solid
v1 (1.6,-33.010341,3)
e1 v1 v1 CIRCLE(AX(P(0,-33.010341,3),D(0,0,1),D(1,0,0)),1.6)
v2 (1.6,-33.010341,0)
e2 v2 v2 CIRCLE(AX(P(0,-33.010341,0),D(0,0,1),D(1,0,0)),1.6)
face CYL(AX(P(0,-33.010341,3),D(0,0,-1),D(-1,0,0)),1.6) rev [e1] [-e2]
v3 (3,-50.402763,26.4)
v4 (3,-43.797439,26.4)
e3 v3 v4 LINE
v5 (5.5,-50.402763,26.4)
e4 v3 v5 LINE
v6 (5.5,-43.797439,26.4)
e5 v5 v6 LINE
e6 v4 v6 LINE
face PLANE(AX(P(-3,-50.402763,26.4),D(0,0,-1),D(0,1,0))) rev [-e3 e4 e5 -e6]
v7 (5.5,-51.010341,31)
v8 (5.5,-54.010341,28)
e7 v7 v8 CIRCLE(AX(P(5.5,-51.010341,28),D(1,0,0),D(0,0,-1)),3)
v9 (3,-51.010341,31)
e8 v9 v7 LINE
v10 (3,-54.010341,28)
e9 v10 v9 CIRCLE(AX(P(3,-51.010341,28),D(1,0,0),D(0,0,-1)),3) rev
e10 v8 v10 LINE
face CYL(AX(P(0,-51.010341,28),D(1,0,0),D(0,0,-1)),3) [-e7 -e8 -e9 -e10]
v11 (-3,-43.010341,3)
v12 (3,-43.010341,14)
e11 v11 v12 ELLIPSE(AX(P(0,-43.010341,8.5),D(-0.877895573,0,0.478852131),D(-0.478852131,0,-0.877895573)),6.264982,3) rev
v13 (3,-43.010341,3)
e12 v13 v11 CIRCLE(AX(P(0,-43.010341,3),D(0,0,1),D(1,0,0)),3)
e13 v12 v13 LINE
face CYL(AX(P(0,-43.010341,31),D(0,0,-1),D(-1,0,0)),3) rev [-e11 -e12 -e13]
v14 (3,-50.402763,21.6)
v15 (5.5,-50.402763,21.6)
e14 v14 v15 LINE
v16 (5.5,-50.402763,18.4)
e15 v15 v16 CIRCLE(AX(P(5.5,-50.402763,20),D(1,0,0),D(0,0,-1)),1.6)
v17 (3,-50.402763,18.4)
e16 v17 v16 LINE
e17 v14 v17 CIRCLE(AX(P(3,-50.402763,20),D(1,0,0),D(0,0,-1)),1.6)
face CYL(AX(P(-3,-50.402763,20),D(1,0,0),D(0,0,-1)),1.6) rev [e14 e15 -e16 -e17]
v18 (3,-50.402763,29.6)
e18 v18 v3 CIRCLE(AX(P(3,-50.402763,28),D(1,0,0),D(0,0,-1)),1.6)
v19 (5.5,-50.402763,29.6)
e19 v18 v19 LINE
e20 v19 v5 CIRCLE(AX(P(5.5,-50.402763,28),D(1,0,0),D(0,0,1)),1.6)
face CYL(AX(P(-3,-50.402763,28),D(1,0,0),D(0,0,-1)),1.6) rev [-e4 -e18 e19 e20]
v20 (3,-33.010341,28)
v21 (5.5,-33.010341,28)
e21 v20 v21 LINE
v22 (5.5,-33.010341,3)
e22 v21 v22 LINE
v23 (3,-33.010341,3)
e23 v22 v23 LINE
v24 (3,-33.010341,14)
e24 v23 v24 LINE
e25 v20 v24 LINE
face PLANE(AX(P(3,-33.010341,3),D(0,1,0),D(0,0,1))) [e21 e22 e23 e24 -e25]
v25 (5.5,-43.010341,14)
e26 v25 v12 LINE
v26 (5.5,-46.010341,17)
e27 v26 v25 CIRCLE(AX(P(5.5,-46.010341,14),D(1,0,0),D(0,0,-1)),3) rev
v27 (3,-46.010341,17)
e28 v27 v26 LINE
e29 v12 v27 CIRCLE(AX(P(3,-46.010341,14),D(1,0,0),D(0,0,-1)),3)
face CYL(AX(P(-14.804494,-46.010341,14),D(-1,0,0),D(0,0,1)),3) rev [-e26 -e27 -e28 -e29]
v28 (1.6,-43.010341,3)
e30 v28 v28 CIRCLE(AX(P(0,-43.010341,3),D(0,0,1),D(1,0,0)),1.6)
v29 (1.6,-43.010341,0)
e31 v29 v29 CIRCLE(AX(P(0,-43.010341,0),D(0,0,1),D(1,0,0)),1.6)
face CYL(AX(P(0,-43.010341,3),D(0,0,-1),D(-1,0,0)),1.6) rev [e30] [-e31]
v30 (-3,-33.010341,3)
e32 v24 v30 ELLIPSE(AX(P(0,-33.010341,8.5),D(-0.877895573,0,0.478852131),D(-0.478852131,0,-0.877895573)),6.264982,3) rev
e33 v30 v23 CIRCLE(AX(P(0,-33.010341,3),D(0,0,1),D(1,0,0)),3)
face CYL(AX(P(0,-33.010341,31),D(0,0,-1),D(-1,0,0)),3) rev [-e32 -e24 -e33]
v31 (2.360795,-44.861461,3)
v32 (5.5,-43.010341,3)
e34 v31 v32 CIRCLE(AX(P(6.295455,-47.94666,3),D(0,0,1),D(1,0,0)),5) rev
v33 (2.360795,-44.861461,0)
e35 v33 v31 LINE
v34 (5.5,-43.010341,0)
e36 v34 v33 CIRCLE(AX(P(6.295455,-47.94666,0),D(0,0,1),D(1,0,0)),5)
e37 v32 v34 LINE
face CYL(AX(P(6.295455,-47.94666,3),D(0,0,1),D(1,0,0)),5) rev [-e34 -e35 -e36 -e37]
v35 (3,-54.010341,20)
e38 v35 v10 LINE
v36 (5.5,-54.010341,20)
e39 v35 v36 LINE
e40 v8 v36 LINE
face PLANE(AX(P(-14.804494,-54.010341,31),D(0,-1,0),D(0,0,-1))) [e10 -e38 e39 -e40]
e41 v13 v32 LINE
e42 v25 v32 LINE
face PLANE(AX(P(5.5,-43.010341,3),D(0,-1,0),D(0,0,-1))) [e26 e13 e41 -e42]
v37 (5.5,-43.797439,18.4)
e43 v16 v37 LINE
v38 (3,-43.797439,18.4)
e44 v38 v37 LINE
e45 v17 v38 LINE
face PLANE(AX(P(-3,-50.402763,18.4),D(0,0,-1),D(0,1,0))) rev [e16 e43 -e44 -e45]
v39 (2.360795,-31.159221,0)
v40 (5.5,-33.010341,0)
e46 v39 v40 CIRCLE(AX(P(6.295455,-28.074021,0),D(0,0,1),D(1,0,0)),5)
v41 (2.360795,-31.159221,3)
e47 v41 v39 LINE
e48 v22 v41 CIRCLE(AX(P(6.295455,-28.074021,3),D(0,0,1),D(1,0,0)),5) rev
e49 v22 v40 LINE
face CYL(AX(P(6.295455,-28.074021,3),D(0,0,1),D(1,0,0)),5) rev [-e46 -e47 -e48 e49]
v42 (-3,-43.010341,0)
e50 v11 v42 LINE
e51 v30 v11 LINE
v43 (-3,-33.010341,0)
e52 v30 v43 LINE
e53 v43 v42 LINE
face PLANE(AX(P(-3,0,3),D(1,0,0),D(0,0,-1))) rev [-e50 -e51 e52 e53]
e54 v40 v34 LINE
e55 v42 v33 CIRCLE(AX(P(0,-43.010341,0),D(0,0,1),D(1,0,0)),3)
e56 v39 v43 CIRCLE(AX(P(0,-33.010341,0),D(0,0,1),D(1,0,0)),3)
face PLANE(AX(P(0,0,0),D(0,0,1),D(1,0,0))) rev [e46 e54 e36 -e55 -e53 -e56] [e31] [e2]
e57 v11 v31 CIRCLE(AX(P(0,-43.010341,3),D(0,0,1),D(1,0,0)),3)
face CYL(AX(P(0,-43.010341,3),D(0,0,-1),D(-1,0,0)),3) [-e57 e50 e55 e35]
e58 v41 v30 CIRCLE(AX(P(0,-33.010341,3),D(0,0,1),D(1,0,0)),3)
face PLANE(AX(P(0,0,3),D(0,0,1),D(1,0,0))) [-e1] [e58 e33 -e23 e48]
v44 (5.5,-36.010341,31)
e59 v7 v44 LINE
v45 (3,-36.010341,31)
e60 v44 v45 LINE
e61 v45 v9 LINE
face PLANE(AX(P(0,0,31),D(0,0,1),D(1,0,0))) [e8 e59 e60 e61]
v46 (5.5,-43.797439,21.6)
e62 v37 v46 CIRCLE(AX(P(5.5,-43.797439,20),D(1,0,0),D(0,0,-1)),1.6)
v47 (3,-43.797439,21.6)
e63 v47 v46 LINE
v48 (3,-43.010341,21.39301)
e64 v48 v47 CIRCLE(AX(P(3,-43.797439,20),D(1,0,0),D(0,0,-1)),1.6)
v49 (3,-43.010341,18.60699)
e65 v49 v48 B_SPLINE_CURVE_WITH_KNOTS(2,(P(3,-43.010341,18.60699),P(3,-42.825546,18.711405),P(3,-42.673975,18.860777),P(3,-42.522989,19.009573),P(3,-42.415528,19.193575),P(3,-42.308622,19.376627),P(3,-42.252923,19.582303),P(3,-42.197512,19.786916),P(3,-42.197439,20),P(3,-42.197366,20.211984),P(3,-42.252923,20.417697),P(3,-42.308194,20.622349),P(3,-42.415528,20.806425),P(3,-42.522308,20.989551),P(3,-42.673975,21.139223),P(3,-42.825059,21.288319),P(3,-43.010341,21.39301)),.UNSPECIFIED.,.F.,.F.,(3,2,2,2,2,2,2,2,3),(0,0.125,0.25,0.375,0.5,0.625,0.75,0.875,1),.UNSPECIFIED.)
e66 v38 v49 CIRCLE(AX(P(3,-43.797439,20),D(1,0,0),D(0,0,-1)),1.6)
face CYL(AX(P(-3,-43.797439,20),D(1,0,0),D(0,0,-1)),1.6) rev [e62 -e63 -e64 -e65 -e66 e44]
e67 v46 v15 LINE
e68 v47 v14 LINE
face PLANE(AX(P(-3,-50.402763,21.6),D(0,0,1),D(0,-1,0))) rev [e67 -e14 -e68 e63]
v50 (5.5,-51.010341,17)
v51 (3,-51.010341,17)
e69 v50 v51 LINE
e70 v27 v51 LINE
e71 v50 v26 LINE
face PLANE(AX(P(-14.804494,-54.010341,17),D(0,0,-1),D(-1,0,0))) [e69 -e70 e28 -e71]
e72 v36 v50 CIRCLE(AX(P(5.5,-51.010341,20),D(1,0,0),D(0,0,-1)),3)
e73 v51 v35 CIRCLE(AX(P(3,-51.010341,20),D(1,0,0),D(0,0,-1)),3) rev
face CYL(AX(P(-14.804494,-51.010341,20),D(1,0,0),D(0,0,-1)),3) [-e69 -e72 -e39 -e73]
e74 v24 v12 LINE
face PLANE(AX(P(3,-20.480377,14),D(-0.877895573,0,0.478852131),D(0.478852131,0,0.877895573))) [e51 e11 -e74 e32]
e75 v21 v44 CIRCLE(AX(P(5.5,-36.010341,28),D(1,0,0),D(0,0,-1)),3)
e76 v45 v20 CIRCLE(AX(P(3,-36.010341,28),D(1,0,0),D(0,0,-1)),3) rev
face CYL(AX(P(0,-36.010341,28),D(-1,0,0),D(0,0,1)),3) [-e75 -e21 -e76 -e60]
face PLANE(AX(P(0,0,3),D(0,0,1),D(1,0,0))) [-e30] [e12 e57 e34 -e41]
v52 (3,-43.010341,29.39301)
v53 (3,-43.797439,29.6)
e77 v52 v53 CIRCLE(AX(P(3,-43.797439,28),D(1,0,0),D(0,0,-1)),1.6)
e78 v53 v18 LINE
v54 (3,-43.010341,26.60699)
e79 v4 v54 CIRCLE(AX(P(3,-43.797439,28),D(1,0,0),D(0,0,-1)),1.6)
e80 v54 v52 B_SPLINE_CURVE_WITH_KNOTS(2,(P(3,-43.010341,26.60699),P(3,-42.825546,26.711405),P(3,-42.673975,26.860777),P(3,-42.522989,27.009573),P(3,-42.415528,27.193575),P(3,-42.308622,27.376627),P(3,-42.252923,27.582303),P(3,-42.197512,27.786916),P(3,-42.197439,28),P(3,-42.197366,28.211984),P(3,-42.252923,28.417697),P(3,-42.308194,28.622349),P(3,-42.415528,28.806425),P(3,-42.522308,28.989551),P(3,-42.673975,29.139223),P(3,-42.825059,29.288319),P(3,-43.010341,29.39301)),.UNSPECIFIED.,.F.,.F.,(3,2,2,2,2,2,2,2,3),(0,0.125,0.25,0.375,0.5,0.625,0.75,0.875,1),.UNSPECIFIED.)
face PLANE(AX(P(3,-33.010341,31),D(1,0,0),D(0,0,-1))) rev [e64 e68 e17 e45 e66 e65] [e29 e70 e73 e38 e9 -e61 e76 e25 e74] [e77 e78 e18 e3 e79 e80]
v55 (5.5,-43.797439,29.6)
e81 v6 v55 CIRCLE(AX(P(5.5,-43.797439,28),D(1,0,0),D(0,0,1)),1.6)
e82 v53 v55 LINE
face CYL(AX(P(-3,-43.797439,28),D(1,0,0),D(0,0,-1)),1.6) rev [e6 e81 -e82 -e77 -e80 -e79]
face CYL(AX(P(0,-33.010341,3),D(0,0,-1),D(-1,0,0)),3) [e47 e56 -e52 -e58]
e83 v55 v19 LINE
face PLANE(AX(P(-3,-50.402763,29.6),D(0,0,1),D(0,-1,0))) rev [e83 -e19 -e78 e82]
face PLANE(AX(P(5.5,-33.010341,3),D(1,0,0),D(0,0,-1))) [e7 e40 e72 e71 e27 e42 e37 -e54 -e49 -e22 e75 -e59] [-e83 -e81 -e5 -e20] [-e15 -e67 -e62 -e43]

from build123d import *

# Parameters (mm, degrees)
SKETCH_1_R          = 1.6
EXTRUDE_1_DEPTH     = 3
SKETCH_3_W          = 2.5
SKETCH_3_H          = 10
EXTRUDE_2_DEPTH     = 28
FILLET_1_R          = 5
FILLET_2_R          = 5
SKETCH_4_W          = 14
SKETCH_4_H          = 11
EXTRUDE_3_DEPTH     = 2.5
CUT_EXTRUDE_1_DEPTH = 63.851944341
EXTRUDE_4_DEPTH     = 10
SKETCH_8_R          = 3
CUT_EXTRUDE_2_DEPTH = 62.084915548
FILLET_3_R          = 3


with BuildPart() as part:
    # 草图1 → 凸台-拉伸1 (new body)
    with BuildSketch(Plane.XY):
        with BuildLine():
            ThreePointArc((3, -33.010340746), (0, -30.010340746), (-3, -33.010340746))
            Line((-3, -33.010340746), (-3, -43.010340746))
            ThreePointArc((-3, -43.010340746), (0, -46.010340746), (3, -43.010340746))
            Line((3, -43.010340746), (5.5, -43.010340746))
            Line((5.5, -43.010340746), (5.5, -33.010340746))
            Line((5.5, -33.010340746), (3, -33.010340746))
        make_face()
        with Locations((0, -33.010340746)):
            Circle(SKETCH_1_R, mode=Mode.SUBTRACT)
        with Locations((0, -43.010340746)):
            Circle(SKETCH_1_R, mode=Mode.SUBTRACT)
    extrude(amount=EXTRUDE_1_DEPTH)

    # 草图3 → 凸台-拉伸2 (add)
    with BuildSketch(Plane.XY.offset(3)):
        with Locations((4.25, -38.010340746)):
            Rectangle(SKETCH_3_W, SKETCH_3_H)
    extrude(amount=EXTRUDE_2_DEPTH)

    # 圆角1
    # the kernel refuses this fillet: 5 mm, written as the material it adds along each edge
    with BuildSketch(Plane(origin=(3, -43.010340746, 0), x_dir=(-0.32639560491693326, -0.9452332564456825, 0), z_dir=(0, 0, 1))) as fillet_1_piece_1:
        with BuildLine():
            CenterArc((3.590351654, 4.726166282), FILLET_1_R, 208.20428203, 42.745569225)
            Line((-0.815989012, 2.363083141), (0, 0))
            ThreePointArc((0, 0), (0.979186815, 0.164300231), (1.95837363, 0))
        make_face()
    extrude(amount=3)

    # 圆角2
    # the kernel refuses this fillet: 5 mm, written as the material it adds along each edge
    with BuildSketch(Plane(origin=(3, -33.010340746, 0), x_dir=(1, 0, 0), z_dir=(0, 0, 1))) as fillet_2_piece_1:
        with BuildLine():
            CenterArc((3.295454545, 4.936319688), FILLET_2_R, 218.100297491, 42.745569225)
            ThreePointArc((-0.639204545, 1.851119883), (-0.164300231, 0.979186815), (0, 0))
            Line((0, 0), (2.5, 0))
        make_face()
    extrude(amount=3)

    # 草图4 → 凸台-拉伸3 (add)
    with BuildSketch(Plane(origin=(5.5, 0, 0), x_dir=(0, 0, -1), z_dir=(1, 0, 0))):
        with Locations((-24, -48.510340746)):
            Rectangle(SKETCH_4_W, SKETCH_4_H)
    extrude(amount=-EXTRUDE_3_DEPTH)

    # 草图5 → 切除-拉伸1 (cut, through all)
    with BuildSketch(Plane(origin=(5.5, 0, 0), x_dir=(0, 0, -1), z_dir=(1, 0, 0))):
        with BuildLine():
            Line((-26.4, -50.402762968), (-26.4, -43.797439087))
            ThreePointArc((-26.4, -43.797439087), (-28, -42.197439087), (-29.6, -43.797439087))
            Line((-29.6, -43.797439087), (-29.6, -50.402762968))
            ThreePointArc((-29.6, -50.402762968), (-28, -52.002762968), (-26.4, -50.402762968))
        make_face()
        with BuildLine():
            Line((-21.6, -50.402762968), (-21.6, -43.797439087))
            ThreePointArc((-21.6, -43.797439087), (-20, -42.197439087), (-18.4, -43.797439087))
            Line((-18.4, -43.797439087), (-18.4, -50.402762968))
            ThreePointArc((-18.4, -50.402762968), (-20, -52.002762968), (-21.6, -50.402762968))
        make_face()
    extrude(amount=-CUT_EXTRUDE_1_DEPTH, mode=Mode.SUBTRACT)

    # 草图6 → 凸台-拉伸4 (add)
    with BuildSketch(Plane.XZ.offset(43.010340746)):
        Polygon((3, 14), (-3, 3), (3, 3), align=None)
    extrude(amount=-EXTRUDE_4_DEPTH)

    # 草图8 → 切除-拉伸2 (cut, through all)
    with BuildSketch(Plane.XY.offset(3)):
        with Locations((0, -43.010340746)):
            Circle(SKETCH_8_R)
        with Locations((0, -33.010340746)):
            Circle(SKETCH_8_R)
    extrude(amount=CUT_EXTRUDE_2_DEPTH, mode=Mode.SUBTRACT)

    # 圆角3
    fillet_3_edges = [part.edges().sort_by_distance(p)[0] for p in [
        (4.25, -43.010340746, 17),
        (4.25, -54.010340746, 17),
        (4.25, -54.010340746, 31),
        (4.25, -33.010340746, 31),
    ]]
    fillet(fillet_3_edges, radius=FILLET_3_R)


solid = part.part
